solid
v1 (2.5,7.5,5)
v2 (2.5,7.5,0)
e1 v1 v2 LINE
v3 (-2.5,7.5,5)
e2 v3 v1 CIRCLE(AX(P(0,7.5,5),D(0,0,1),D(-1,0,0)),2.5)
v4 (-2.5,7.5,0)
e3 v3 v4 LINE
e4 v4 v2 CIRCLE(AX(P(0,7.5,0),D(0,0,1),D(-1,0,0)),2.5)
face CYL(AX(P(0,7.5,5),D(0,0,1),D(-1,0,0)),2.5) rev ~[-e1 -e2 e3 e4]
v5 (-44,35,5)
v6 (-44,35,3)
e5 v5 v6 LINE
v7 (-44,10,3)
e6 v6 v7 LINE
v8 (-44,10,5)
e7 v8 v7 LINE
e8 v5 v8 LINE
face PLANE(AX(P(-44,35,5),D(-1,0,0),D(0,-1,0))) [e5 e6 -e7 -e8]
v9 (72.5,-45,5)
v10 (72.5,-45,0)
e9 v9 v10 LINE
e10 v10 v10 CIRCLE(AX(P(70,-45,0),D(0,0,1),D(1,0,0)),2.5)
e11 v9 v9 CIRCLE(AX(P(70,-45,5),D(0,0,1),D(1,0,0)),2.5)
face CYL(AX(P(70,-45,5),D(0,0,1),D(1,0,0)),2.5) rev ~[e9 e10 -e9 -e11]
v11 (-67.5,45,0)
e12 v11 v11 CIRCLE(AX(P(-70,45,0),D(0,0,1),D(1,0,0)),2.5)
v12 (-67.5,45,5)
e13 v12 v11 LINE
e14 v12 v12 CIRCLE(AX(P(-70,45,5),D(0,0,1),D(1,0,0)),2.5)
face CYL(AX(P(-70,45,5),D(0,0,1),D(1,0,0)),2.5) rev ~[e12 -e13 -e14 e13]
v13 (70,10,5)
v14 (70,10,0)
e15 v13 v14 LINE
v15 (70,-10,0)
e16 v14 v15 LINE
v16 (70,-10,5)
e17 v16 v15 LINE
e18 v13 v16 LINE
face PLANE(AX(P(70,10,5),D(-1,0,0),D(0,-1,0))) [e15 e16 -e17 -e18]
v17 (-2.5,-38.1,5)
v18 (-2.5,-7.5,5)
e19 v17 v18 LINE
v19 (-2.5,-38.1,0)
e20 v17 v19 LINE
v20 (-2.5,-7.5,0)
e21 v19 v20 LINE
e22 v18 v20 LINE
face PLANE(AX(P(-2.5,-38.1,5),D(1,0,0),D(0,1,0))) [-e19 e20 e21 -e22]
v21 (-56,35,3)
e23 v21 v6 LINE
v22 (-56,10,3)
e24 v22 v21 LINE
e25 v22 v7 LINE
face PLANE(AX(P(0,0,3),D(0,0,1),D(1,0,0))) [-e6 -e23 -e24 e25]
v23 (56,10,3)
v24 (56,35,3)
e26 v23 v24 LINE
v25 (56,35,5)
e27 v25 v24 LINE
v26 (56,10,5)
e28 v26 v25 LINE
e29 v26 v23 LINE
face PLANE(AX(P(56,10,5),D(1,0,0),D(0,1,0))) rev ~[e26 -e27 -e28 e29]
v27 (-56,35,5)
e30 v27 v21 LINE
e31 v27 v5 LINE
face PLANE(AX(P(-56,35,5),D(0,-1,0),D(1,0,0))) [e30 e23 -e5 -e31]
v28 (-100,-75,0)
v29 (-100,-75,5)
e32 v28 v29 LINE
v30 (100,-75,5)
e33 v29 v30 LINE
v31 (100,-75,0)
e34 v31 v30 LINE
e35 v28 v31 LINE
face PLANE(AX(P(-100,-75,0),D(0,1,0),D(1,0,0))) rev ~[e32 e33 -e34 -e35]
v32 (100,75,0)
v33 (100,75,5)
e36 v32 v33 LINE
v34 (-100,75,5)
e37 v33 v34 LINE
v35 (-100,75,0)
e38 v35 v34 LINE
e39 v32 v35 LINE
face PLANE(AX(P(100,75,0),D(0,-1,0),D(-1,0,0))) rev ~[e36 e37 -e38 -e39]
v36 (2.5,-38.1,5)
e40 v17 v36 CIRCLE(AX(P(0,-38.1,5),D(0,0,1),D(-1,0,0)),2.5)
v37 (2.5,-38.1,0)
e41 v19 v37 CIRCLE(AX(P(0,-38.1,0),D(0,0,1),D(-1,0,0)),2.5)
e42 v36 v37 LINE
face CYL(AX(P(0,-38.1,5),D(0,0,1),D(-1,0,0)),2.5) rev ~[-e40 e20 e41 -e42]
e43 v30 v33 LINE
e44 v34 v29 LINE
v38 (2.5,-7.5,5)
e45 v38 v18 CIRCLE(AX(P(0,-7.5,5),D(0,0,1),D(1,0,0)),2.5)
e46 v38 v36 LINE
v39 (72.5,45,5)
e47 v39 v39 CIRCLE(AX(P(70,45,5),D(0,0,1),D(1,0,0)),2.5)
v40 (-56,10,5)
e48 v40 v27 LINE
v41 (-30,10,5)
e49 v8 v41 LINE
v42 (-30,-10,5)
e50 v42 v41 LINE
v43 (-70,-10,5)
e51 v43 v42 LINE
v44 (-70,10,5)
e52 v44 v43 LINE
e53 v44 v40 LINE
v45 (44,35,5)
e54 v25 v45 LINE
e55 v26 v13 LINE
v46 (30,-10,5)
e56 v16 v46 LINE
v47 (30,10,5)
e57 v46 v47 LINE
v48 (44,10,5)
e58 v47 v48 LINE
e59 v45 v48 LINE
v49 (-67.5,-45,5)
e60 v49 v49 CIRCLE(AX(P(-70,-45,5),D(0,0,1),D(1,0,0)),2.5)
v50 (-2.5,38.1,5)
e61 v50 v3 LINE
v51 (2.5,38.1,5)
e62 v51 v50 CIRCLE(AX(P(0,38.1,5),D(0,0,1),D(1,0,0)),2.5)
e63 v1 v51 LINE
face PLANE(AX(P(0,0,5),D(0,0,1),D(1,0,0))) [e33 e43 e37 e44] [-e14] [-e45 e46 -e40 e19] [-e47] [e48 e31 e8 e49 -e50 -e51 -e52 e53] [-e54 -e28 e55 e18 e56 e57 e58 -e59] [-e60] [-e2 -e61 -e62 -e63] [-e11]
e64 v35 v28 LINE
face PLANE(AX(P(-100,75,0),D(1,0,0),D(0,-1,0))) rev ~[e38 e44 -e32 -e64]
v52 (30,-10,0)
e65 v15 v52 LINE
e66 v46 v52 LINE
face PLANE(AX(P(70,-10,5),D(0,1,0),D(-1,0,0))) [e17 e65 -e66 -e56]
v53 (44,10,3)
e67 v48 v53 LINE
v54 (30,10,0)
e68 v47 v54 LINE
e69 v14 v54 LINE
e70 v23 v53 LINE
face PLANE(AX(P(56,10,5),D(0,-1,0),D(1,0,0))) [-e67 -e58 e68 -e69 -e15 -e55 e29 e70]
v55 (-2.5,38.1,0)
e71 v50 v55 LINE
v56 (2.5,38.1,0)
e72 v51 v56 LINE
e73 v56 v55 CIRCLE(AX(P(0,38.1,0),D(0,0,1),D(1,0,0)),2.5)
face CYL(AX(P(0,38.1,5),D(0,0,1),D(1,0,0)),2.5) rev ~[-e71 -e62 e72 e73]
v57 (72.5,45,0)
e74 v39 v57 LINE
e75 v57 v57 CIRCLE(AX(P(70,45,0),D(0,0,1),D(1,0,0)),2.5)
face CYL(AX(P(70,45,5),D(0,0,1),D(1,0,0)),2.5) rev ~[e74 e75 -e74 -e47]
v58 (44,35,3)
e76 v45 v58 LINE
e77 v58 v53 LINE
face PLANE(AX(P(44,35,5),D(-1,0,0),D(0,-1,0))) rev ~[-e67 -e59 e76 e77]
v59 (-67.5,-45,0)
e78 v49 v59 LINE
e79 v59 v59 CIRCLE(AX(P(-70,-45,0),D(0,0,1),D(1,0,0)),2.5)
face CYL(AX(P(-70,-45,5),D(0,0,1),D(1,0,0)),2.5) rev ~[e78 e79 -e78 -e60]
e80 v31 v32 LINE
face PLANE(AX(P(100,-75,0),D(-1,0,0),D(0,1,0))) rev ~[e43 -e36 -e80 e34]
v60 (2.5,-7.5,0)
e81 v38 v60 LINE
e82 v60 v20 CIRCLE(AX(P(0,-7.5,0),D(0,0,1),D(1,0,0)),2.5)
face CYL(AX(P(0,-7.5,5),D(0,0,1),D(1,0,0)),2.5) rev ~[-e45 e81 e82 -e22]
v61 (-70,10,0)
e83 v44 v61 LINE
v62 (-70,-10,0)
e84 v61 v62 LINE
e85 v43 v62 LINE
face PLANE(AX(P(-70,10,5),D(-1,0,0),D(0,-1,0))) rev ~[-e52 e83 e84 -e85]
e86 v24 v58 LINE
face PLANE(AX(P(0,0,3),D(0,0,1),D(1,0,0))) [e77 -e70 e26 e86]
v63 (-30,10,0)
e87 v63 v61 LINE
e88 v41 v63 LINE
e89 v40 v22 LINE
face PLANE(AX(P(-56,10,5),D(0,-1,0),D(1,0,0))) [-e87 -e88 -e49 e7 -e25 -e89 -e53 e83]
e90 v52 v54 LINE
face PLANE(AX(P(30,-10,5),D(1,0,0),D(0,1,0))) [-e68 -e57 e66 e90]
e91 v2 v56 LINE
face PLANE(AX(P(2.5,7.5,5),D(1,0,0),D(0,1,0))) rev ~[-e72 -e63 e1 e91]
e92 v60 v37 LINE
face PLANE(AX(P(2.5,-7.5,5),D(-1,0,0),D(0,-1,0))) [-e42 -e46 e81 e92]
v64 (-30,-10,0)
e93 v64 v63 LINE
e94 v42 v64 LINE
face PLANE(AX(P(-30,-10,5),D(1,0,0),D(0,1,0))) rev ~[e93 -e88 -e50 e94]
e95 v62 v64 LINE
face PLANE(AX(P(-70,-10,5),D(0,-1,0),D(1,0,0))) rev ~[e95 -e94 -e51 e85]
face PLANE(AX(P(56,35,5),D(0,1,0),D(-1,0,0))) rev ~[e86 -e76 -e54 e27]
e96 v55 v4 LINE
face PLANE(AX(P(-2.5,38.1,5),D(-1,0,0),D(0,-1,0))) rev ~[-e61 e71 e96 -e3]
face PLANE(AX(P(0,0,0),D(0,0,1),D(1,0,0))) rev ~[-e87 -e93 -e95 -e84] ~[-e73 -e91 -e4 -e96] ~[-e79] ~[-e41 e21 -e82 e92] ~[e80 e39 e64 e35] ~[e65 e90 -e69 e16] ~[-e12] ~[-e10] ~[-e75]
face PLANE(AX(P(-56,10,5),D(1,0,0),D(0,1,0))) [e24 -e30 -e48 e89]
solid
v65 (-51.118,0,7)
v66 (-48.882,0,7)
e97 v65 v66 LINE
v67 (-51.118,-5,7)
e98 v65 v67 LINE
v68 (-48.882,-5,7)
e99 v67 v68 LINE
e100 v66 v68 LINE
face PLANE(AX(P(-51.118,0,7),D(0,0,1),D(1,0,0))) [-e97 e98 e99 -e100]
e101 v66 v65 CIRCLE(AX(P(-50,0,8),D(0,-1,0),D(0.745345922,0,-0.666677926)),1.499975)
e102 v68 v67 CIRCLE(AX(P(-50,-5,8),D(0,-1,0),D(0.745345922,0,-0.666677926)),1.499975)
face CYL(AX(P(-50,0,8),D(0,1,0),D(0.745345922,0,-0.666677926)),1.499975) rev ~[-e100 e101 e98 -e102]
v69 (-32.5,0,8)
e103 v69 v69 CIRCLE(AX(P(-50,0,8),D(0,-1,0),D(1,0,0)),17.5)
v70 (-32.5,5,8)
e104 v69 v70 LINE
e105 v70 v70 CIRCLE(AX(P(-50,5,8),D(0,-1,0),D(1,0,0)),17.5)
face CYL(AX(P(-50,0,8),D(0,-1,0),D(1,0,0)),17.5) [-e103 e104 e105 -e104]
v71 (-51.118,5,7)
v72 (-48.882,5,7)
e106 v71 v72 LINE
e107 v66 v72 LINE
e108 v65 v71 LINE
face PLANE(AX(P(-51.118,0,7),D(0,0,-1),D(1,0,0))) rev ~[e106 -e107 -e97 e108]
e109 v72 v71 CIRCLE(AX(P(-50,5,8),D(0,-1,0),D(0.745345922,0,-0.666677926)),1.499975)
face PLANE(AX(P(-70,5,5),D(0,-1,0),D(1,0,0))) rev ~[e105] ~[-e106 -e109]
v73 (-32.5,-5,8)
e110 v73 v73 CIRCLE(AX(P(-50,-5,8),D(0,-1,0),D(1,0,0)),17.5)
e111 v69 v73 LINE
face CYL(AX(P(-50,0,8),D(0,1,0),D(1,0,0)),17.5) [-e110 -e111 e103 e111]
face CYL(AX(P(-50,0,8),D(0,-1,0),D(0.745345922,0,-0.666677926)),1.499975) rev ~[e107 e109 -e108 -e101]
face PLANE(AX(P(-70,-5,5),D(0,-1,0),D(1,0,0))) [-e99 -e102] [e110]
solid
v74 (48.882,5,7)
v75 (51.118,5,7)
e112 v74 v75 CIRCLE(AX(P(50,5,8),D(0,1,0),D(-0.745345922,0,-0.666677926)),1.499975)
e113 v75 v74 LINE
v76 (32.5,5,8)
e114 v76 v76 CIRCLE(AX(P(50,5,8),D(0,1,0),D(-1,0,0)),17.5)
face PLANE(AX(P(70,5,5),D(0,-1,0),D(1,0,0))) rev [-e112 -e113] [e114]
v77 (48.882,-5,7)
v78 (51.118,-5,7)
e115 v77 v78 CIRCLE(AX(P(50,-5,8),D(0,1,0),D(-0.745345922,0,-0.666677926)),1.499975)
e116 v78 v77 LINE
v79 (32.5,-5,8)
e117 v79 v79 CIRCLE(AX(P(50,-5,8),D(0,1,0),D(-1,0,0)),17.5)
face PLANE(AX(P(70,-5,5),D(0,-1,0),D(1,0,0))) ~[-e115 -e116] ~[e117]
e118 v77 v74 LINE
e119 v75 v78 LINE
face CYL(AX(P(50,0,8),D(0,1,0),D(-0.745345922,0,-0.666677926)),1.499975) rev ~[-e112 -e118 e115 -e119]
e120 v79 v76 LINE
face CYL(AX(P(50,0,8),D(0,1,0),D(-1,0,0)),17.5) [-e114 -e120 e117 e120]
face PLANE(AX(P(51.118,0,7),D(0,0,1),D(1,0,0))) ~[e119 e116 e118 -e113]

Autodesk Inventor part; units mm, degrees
ref_plane "YZ Plane" through (0, 0, 0) normal (1, 0, 0) x (0, 1, 0)
ref_plane "XZ Plane" through (0, 0, 0) normal (0, 1, 0) x (-1, 0, 0)
sketch "Эскиз1" plane through (0, 0, 0) normal (0, 0, 1) x (1, 0, 0)
  line L0 (-100, -75) -> (100, -75)
  line L1 (100, -75) -> (100, 75)
  line L2 (100, 75) -> (-100, 75)
  line L3 (-100, 75) -> (-100, -75)
  line L4 (-100, -75) -> (100, 75) construction
  line L5 (100, -75) -> (-100, 75) construction
  point P0 (0, 0)
  dimension "d0" = 200
  dimension "d1" = 150
extrude "Выдавливание1" add sketch "Эскиз1" along normal blind 5
sketch "Эскиз2" plane through (0, 0, 5) normal (0, 0, 1) x (1, 0, 0)
  line L0 (100, -75) -> (100, 75) construction
  line L1 (100, 0) -> (-100, 0) construction
  line L2 (-100, 75) -> (-100, -75) construction
  line L3 (100, 75) -> (-100, 75) construction
  line L4 (0, 75) -> (0, -75) construction
  line L5 (-100, -75) -> (100, -75) construction
  line L6 (-100, -10) -> (100, -10) construction
  line L7 (100, -10) -> (100, 10) construction
  line L8 (100, 10) -> (-100, 10) construction
  line L9 (-100, 10) -> (-100, -10) construction
  line L10 (-100, -10) -> (100, 10) construction
  line L11 (100, -10) -> (-100, 10) construction
  line L12 (0, 0) -> (-100, 0) construction
  line L13 (-50, 0) -> (-50, 75) construction
  line L14 (0, 0) -> (100, 0) construction
  line L15 (50, 0) -> (50, 75) construction
  line L16 (-56, 10) -> (-56, 35)
  line L17 (-56, 35) -> (-44, 35)
  line L18 (-44, 35) -> (-44, 10)
  line L19 (-56, 10) -> (-44, 10)
  line L20 (56, 10) -> (56, 35)
  line L21 (56, 35) -> (44, 35)
  line L22 (44, 35) -> (44, 10)
  line L23 (56, 10) -> (44, 10)
  line L24 (-70, -10) -> (-30, -10)
  line L25 (-30, -10) -> (-30, 10)
  line L26 (-30, 10) -> (-70, 10)
  line L27 (-70, 10) -> (-70, -10)
  line L28 (-70, -10) -> (-30, 10) construction
  line L29 (-30, -10) -> (-70, 10) construction
  line L30 (70, -10) -> (30, -10)
  line L31 (30, -10) -> (30, 10)
  line L32 (30, 10) -> (70, 10)
  line L33 (70, 10) -> (70, -10)
  dimension "d4" = 20
  dimension "d7" = 25
  dimension "d8" = 40
extrude "Выдавливание2" cut sketch "Эскиз2" against normal blind 2 contours L16 L17 L18 L19 | L23 L22 L21 L20
extrude "Выдавливание3" cut sketch "Эскиз2" against normal blind 5 contours L19 L26 L25 L24 L27 | L32 L33 L30 L31 L23
sketch "Эскиз3" plane through (0, 0, 3) normal (0, 0, 1) x (1, 0, 0)
  line L0 (-56, 10) -> (-56, 35) projected
  line L1 (-44, 10) -> (-56, 10) projected
  line L2 (-44, 35) -> (-44, 10) projected
  line L3 (-56, 35) -> (-44, 35) projected
  line L4 (-44, 35) -> (-44, 10) projected
  point P0 (0, 0)
surface extrude "ВыдавПврх1" sketch "Эскиз3" along normal blind 10 shown yes curves L4 L1 L0 L3
boundary_patch "Участок поверхности1"
sketch "Эскиз4" plane through (-56, 10, 3) normal (0, -1, 0) x (1, 0, 0)
  line L0 (0, 10) -> (12, 10) construction
  line L1 (6, 10) -> (6, 0) construction
  line L2 (12, 0) -> (0, 0) construction
  line L3 (0, 0) -> (0, 10) construction
  line L4 (0, 5) -> (12, 5) construction
  line L5 (12, 0) -> (12, 10) construction
  arc A0 (7.118, 4) -> (4.882, 4) centre (6, 5) ccw
  line L6 (6, 3.5) -> (6, 4) construction
  line L7 (6, 4) -> (7.118, 4)
  line L8 (6, 4) -> (4.882, 4)
  point P0 (56, -3)
  dimension "d17" = 3
  dimension "d18" = 0.5
surface extrude "ВыдавПврх2" sketch "Эскиз4" along normal blind 10 shown yes curves L7 A0 L8
boundary_patch "Участок поверхности2"
mirror "Зеркальное отражение1" about plane through (0, 0, 0) normal (1, 0, 0) of "Участок поверхности1", "ВыдавПврх1", "ВыдавПврх2"
ref_plane "РабПлоскость1" through (-70, 0, 5) normal (0, -1, 0) x (1, 0, 0)
sketch "Эскиз5" plane through (-70, 0, 5) normal (0, -1, 0) x (1, 0, 0)
  arc A0 (21.118, 2) -> (18.882, 2) centre (20, 3) ccw projected
  line L0 (18.882, 2) -> (21.118, 2) projected
  circle A1 centre (20, 3) radius 17.5
  point P0 (70, -5)
  dimension "d23" = 35
extrude "Выдавливание4" add sketch "Эскиз5" along normal mid plane 10
mirror "Зеркальное отражение2" about plane through (0, 0, 0) normal (1, 0, 0) of "Выдавливание4"
sketch "Эскиз6" plane through (0, 0, 5) normal (0, 0, 1) x (1, 0, 0)
  line L0 (-100, -75) -> (100, -75) projected
  line L1 (100, -75) -> (100, 75) projected
  line L2 (100, 75) -> (-100, 75) projected
  line L3 (-100, 75) -> (-100, -75) projected
  line L4 (-44, 10) -> (-30, 10) projected
  line L5 (-30, 10) -> (-30, -10) projected
  line L6 (-30, -10) -> (-70, -10) projected
  line L7 (-70, -10) -> (-70, 10) projected
  line L8 (-70, 10) -> (-56, 10) projected
  line L9 (-56, 10) -> (-56, 35) projected
  line L10 (-56, 35) -> (-44, 35) projected
  line L11 (-44, 35) -> (-44, 10) projected
  line L12 (30, 10) -> (44, 10) projected
  line L13 (44, 10) -> (44, 35) projected
  line L14 (44, 35) -> (56, 35) projected
  line L15 (56, 35) -> (56, 10) projected
  line L16 (56, 10) -> (70, 10) projected
  line L17 (70, 10) -> (70, -10) projected
  line L18 (70, -10) -> (30, -10) projected
  line L19 (30, -10) -> (30, 10) projected
  line L20 (100, -75) -> (70, -75)
  line L21 (70, -75) -> (70, -45) construction
  line L22 (70, -45) -> (100, -45) construction
  line L23 (100, -45) -> (100, -75)
  circle A0 centre (70, -45) radius 2.5
  line L24 (-100, 0) -> (100, 0) construction
  line L25 (100, 75) -> (-100, 75) construction
  line L26 (0, 75) -> (0, -75) construction
  circle A1 centre (-70, -45) radius 2.5
  circle A2 centre (70, 45) radius 2.5
  circle A3 centre (-70, 45) radius 2.5
  point P0 (0, 0)
  dimension "d26" = 30
  dimension "d27" = 30
  dimension "d28" = 5
extrude "Выдавливание5" cut sketch "Эскиз6" against normal blind 10 contours A0 | A1 | A2 | A3
sketch "Эскиз7" plane through (0, 0, 5) normal (0, 0, 1) x (1, 0, 0)
  circle A0 centre (-70, 45) radius 2.5 projected
  circle A1 centre (70, -45) radius 2.5 projected
  circle A2 centre (-70, -45) radius 2.5 projected
  circle A3 centre (70, 45) radius 2.5 projected
  line L0 (-100, -75) -> (100, -75) projected
  line L1 (100, -75) -> (100, 75) projected
  line L2 (100, 75) -> (-100, 75) projected
  line L3 (-100, 75) -> (-100, -75) projected
  line L4 (-44, 10) -> (-30, 10) projected
  line L5 (-30, 10) -> (-30, -10) projected
  line L6 (-30, -10) -> (-70, -10) projected
  line L7 (-70, -10) -> (-70, 10) projected
  line L8 (-70, 10) -> (-56, 10) projected
  line L9 (-56, 10) -> (-56, 35) projected
  line L10 (-56, 35) -> (-44, 35) projected
  line L11 (-44, 35) -> (-44, 10) projected
  line L12 (30, 10) -> (44, 10) projected
  line L13 (44, 10) -> (44, 35) projected
  line L14 (44, 35) -> (56, 35) projected
  line L15 (56, 35) -> (56, 10) projected
  line L16 (56, 10) -> (70, 10) projected
  line L17 (70, 10) -> (70, -10) projected
  line L18 (70, -10) -> (30, -10) projected
  line L19 (30, -10) -> (30, 10) projected
  line L20 (100, 75) -> (-100, 75) construction
  line L21 (-30, 10) -> (30, 10) construction
  line L22 (30, 10) -> (30, 75) construction
  line L23 (30, 75) -> (-30, 75) construction
  line L24 (-30, 75) -> (-30, 10) construction
  line L25 (-100, -75) -> (100, -75) construction
  line L26 (-30, -10) -> (30, -10) construction
  line L27 (30, -10) -> (30, -75) construction
  line L28 (30, -75) -> (-30, -75) construction
  line L29 (-30, -75) -> (-30, -10) construction
  line L30 (100, -75) -> (100, 75) construction
  line L31 (100, -7.5) -> (100, 7.5) construction
  line L32 (100, 7.5) -> (-100, 7.5) construction
  line L33 (-100, 7.5) -> (-100, -7.5) construction
  line L34 (-100, -7.5) -> (100, 7.5) construction
  line L35 (100, -7.5) -> (-100, 7.5) construction
  line L36 (-100, -7.5) -> (-2.5, -7.5) construction
  line L37 (2.5, -7.5) -> (100, -7.5) construction
  line L38 (-100, 75) -> (-100, -75) construction
  line L39 (-100, 0) -> (100, 0) construction
  arc A4 (-2.5, 7.5) -> (2.5, 7.5) centre (0, 7.5) ccw
  line L40 (2.5, 7.5) -> (2.5, 38.1)
  line L41 (-2.5, 38.1) -> (-2.5, 7.5)
  arc A5 (2.5, 38.1) -> (-2.5, 38.1) centre (0, 38.1) ccw
  line L42 (-2.5, 38.1) -> (-2.5, 7.5)
  line L43 (2.5, 7.5) -> (2.5, 38.1)
  line L44 (-2.5, -38.1) -> (-2.5, -7.5)
  line L45 (2.5, -7.5) -> (2.5, -38.1)
  arc A6 (-2.5, -38.1) -> (2.5, -38.1) centre (0, -38.1) ccw
  arc A7 (2.5, -7.5) -> (-2.5, -7.5) centre (0, -7.5) ccw
  point P0 (0, 0)
  dimension "d31" = 15
extrude "Выдавливание7" cut sketch "Эскиз7" against normal blind 10 contours L41 A5 L40 A4 | L44 A7 L45 A6
properties part number "Top"
